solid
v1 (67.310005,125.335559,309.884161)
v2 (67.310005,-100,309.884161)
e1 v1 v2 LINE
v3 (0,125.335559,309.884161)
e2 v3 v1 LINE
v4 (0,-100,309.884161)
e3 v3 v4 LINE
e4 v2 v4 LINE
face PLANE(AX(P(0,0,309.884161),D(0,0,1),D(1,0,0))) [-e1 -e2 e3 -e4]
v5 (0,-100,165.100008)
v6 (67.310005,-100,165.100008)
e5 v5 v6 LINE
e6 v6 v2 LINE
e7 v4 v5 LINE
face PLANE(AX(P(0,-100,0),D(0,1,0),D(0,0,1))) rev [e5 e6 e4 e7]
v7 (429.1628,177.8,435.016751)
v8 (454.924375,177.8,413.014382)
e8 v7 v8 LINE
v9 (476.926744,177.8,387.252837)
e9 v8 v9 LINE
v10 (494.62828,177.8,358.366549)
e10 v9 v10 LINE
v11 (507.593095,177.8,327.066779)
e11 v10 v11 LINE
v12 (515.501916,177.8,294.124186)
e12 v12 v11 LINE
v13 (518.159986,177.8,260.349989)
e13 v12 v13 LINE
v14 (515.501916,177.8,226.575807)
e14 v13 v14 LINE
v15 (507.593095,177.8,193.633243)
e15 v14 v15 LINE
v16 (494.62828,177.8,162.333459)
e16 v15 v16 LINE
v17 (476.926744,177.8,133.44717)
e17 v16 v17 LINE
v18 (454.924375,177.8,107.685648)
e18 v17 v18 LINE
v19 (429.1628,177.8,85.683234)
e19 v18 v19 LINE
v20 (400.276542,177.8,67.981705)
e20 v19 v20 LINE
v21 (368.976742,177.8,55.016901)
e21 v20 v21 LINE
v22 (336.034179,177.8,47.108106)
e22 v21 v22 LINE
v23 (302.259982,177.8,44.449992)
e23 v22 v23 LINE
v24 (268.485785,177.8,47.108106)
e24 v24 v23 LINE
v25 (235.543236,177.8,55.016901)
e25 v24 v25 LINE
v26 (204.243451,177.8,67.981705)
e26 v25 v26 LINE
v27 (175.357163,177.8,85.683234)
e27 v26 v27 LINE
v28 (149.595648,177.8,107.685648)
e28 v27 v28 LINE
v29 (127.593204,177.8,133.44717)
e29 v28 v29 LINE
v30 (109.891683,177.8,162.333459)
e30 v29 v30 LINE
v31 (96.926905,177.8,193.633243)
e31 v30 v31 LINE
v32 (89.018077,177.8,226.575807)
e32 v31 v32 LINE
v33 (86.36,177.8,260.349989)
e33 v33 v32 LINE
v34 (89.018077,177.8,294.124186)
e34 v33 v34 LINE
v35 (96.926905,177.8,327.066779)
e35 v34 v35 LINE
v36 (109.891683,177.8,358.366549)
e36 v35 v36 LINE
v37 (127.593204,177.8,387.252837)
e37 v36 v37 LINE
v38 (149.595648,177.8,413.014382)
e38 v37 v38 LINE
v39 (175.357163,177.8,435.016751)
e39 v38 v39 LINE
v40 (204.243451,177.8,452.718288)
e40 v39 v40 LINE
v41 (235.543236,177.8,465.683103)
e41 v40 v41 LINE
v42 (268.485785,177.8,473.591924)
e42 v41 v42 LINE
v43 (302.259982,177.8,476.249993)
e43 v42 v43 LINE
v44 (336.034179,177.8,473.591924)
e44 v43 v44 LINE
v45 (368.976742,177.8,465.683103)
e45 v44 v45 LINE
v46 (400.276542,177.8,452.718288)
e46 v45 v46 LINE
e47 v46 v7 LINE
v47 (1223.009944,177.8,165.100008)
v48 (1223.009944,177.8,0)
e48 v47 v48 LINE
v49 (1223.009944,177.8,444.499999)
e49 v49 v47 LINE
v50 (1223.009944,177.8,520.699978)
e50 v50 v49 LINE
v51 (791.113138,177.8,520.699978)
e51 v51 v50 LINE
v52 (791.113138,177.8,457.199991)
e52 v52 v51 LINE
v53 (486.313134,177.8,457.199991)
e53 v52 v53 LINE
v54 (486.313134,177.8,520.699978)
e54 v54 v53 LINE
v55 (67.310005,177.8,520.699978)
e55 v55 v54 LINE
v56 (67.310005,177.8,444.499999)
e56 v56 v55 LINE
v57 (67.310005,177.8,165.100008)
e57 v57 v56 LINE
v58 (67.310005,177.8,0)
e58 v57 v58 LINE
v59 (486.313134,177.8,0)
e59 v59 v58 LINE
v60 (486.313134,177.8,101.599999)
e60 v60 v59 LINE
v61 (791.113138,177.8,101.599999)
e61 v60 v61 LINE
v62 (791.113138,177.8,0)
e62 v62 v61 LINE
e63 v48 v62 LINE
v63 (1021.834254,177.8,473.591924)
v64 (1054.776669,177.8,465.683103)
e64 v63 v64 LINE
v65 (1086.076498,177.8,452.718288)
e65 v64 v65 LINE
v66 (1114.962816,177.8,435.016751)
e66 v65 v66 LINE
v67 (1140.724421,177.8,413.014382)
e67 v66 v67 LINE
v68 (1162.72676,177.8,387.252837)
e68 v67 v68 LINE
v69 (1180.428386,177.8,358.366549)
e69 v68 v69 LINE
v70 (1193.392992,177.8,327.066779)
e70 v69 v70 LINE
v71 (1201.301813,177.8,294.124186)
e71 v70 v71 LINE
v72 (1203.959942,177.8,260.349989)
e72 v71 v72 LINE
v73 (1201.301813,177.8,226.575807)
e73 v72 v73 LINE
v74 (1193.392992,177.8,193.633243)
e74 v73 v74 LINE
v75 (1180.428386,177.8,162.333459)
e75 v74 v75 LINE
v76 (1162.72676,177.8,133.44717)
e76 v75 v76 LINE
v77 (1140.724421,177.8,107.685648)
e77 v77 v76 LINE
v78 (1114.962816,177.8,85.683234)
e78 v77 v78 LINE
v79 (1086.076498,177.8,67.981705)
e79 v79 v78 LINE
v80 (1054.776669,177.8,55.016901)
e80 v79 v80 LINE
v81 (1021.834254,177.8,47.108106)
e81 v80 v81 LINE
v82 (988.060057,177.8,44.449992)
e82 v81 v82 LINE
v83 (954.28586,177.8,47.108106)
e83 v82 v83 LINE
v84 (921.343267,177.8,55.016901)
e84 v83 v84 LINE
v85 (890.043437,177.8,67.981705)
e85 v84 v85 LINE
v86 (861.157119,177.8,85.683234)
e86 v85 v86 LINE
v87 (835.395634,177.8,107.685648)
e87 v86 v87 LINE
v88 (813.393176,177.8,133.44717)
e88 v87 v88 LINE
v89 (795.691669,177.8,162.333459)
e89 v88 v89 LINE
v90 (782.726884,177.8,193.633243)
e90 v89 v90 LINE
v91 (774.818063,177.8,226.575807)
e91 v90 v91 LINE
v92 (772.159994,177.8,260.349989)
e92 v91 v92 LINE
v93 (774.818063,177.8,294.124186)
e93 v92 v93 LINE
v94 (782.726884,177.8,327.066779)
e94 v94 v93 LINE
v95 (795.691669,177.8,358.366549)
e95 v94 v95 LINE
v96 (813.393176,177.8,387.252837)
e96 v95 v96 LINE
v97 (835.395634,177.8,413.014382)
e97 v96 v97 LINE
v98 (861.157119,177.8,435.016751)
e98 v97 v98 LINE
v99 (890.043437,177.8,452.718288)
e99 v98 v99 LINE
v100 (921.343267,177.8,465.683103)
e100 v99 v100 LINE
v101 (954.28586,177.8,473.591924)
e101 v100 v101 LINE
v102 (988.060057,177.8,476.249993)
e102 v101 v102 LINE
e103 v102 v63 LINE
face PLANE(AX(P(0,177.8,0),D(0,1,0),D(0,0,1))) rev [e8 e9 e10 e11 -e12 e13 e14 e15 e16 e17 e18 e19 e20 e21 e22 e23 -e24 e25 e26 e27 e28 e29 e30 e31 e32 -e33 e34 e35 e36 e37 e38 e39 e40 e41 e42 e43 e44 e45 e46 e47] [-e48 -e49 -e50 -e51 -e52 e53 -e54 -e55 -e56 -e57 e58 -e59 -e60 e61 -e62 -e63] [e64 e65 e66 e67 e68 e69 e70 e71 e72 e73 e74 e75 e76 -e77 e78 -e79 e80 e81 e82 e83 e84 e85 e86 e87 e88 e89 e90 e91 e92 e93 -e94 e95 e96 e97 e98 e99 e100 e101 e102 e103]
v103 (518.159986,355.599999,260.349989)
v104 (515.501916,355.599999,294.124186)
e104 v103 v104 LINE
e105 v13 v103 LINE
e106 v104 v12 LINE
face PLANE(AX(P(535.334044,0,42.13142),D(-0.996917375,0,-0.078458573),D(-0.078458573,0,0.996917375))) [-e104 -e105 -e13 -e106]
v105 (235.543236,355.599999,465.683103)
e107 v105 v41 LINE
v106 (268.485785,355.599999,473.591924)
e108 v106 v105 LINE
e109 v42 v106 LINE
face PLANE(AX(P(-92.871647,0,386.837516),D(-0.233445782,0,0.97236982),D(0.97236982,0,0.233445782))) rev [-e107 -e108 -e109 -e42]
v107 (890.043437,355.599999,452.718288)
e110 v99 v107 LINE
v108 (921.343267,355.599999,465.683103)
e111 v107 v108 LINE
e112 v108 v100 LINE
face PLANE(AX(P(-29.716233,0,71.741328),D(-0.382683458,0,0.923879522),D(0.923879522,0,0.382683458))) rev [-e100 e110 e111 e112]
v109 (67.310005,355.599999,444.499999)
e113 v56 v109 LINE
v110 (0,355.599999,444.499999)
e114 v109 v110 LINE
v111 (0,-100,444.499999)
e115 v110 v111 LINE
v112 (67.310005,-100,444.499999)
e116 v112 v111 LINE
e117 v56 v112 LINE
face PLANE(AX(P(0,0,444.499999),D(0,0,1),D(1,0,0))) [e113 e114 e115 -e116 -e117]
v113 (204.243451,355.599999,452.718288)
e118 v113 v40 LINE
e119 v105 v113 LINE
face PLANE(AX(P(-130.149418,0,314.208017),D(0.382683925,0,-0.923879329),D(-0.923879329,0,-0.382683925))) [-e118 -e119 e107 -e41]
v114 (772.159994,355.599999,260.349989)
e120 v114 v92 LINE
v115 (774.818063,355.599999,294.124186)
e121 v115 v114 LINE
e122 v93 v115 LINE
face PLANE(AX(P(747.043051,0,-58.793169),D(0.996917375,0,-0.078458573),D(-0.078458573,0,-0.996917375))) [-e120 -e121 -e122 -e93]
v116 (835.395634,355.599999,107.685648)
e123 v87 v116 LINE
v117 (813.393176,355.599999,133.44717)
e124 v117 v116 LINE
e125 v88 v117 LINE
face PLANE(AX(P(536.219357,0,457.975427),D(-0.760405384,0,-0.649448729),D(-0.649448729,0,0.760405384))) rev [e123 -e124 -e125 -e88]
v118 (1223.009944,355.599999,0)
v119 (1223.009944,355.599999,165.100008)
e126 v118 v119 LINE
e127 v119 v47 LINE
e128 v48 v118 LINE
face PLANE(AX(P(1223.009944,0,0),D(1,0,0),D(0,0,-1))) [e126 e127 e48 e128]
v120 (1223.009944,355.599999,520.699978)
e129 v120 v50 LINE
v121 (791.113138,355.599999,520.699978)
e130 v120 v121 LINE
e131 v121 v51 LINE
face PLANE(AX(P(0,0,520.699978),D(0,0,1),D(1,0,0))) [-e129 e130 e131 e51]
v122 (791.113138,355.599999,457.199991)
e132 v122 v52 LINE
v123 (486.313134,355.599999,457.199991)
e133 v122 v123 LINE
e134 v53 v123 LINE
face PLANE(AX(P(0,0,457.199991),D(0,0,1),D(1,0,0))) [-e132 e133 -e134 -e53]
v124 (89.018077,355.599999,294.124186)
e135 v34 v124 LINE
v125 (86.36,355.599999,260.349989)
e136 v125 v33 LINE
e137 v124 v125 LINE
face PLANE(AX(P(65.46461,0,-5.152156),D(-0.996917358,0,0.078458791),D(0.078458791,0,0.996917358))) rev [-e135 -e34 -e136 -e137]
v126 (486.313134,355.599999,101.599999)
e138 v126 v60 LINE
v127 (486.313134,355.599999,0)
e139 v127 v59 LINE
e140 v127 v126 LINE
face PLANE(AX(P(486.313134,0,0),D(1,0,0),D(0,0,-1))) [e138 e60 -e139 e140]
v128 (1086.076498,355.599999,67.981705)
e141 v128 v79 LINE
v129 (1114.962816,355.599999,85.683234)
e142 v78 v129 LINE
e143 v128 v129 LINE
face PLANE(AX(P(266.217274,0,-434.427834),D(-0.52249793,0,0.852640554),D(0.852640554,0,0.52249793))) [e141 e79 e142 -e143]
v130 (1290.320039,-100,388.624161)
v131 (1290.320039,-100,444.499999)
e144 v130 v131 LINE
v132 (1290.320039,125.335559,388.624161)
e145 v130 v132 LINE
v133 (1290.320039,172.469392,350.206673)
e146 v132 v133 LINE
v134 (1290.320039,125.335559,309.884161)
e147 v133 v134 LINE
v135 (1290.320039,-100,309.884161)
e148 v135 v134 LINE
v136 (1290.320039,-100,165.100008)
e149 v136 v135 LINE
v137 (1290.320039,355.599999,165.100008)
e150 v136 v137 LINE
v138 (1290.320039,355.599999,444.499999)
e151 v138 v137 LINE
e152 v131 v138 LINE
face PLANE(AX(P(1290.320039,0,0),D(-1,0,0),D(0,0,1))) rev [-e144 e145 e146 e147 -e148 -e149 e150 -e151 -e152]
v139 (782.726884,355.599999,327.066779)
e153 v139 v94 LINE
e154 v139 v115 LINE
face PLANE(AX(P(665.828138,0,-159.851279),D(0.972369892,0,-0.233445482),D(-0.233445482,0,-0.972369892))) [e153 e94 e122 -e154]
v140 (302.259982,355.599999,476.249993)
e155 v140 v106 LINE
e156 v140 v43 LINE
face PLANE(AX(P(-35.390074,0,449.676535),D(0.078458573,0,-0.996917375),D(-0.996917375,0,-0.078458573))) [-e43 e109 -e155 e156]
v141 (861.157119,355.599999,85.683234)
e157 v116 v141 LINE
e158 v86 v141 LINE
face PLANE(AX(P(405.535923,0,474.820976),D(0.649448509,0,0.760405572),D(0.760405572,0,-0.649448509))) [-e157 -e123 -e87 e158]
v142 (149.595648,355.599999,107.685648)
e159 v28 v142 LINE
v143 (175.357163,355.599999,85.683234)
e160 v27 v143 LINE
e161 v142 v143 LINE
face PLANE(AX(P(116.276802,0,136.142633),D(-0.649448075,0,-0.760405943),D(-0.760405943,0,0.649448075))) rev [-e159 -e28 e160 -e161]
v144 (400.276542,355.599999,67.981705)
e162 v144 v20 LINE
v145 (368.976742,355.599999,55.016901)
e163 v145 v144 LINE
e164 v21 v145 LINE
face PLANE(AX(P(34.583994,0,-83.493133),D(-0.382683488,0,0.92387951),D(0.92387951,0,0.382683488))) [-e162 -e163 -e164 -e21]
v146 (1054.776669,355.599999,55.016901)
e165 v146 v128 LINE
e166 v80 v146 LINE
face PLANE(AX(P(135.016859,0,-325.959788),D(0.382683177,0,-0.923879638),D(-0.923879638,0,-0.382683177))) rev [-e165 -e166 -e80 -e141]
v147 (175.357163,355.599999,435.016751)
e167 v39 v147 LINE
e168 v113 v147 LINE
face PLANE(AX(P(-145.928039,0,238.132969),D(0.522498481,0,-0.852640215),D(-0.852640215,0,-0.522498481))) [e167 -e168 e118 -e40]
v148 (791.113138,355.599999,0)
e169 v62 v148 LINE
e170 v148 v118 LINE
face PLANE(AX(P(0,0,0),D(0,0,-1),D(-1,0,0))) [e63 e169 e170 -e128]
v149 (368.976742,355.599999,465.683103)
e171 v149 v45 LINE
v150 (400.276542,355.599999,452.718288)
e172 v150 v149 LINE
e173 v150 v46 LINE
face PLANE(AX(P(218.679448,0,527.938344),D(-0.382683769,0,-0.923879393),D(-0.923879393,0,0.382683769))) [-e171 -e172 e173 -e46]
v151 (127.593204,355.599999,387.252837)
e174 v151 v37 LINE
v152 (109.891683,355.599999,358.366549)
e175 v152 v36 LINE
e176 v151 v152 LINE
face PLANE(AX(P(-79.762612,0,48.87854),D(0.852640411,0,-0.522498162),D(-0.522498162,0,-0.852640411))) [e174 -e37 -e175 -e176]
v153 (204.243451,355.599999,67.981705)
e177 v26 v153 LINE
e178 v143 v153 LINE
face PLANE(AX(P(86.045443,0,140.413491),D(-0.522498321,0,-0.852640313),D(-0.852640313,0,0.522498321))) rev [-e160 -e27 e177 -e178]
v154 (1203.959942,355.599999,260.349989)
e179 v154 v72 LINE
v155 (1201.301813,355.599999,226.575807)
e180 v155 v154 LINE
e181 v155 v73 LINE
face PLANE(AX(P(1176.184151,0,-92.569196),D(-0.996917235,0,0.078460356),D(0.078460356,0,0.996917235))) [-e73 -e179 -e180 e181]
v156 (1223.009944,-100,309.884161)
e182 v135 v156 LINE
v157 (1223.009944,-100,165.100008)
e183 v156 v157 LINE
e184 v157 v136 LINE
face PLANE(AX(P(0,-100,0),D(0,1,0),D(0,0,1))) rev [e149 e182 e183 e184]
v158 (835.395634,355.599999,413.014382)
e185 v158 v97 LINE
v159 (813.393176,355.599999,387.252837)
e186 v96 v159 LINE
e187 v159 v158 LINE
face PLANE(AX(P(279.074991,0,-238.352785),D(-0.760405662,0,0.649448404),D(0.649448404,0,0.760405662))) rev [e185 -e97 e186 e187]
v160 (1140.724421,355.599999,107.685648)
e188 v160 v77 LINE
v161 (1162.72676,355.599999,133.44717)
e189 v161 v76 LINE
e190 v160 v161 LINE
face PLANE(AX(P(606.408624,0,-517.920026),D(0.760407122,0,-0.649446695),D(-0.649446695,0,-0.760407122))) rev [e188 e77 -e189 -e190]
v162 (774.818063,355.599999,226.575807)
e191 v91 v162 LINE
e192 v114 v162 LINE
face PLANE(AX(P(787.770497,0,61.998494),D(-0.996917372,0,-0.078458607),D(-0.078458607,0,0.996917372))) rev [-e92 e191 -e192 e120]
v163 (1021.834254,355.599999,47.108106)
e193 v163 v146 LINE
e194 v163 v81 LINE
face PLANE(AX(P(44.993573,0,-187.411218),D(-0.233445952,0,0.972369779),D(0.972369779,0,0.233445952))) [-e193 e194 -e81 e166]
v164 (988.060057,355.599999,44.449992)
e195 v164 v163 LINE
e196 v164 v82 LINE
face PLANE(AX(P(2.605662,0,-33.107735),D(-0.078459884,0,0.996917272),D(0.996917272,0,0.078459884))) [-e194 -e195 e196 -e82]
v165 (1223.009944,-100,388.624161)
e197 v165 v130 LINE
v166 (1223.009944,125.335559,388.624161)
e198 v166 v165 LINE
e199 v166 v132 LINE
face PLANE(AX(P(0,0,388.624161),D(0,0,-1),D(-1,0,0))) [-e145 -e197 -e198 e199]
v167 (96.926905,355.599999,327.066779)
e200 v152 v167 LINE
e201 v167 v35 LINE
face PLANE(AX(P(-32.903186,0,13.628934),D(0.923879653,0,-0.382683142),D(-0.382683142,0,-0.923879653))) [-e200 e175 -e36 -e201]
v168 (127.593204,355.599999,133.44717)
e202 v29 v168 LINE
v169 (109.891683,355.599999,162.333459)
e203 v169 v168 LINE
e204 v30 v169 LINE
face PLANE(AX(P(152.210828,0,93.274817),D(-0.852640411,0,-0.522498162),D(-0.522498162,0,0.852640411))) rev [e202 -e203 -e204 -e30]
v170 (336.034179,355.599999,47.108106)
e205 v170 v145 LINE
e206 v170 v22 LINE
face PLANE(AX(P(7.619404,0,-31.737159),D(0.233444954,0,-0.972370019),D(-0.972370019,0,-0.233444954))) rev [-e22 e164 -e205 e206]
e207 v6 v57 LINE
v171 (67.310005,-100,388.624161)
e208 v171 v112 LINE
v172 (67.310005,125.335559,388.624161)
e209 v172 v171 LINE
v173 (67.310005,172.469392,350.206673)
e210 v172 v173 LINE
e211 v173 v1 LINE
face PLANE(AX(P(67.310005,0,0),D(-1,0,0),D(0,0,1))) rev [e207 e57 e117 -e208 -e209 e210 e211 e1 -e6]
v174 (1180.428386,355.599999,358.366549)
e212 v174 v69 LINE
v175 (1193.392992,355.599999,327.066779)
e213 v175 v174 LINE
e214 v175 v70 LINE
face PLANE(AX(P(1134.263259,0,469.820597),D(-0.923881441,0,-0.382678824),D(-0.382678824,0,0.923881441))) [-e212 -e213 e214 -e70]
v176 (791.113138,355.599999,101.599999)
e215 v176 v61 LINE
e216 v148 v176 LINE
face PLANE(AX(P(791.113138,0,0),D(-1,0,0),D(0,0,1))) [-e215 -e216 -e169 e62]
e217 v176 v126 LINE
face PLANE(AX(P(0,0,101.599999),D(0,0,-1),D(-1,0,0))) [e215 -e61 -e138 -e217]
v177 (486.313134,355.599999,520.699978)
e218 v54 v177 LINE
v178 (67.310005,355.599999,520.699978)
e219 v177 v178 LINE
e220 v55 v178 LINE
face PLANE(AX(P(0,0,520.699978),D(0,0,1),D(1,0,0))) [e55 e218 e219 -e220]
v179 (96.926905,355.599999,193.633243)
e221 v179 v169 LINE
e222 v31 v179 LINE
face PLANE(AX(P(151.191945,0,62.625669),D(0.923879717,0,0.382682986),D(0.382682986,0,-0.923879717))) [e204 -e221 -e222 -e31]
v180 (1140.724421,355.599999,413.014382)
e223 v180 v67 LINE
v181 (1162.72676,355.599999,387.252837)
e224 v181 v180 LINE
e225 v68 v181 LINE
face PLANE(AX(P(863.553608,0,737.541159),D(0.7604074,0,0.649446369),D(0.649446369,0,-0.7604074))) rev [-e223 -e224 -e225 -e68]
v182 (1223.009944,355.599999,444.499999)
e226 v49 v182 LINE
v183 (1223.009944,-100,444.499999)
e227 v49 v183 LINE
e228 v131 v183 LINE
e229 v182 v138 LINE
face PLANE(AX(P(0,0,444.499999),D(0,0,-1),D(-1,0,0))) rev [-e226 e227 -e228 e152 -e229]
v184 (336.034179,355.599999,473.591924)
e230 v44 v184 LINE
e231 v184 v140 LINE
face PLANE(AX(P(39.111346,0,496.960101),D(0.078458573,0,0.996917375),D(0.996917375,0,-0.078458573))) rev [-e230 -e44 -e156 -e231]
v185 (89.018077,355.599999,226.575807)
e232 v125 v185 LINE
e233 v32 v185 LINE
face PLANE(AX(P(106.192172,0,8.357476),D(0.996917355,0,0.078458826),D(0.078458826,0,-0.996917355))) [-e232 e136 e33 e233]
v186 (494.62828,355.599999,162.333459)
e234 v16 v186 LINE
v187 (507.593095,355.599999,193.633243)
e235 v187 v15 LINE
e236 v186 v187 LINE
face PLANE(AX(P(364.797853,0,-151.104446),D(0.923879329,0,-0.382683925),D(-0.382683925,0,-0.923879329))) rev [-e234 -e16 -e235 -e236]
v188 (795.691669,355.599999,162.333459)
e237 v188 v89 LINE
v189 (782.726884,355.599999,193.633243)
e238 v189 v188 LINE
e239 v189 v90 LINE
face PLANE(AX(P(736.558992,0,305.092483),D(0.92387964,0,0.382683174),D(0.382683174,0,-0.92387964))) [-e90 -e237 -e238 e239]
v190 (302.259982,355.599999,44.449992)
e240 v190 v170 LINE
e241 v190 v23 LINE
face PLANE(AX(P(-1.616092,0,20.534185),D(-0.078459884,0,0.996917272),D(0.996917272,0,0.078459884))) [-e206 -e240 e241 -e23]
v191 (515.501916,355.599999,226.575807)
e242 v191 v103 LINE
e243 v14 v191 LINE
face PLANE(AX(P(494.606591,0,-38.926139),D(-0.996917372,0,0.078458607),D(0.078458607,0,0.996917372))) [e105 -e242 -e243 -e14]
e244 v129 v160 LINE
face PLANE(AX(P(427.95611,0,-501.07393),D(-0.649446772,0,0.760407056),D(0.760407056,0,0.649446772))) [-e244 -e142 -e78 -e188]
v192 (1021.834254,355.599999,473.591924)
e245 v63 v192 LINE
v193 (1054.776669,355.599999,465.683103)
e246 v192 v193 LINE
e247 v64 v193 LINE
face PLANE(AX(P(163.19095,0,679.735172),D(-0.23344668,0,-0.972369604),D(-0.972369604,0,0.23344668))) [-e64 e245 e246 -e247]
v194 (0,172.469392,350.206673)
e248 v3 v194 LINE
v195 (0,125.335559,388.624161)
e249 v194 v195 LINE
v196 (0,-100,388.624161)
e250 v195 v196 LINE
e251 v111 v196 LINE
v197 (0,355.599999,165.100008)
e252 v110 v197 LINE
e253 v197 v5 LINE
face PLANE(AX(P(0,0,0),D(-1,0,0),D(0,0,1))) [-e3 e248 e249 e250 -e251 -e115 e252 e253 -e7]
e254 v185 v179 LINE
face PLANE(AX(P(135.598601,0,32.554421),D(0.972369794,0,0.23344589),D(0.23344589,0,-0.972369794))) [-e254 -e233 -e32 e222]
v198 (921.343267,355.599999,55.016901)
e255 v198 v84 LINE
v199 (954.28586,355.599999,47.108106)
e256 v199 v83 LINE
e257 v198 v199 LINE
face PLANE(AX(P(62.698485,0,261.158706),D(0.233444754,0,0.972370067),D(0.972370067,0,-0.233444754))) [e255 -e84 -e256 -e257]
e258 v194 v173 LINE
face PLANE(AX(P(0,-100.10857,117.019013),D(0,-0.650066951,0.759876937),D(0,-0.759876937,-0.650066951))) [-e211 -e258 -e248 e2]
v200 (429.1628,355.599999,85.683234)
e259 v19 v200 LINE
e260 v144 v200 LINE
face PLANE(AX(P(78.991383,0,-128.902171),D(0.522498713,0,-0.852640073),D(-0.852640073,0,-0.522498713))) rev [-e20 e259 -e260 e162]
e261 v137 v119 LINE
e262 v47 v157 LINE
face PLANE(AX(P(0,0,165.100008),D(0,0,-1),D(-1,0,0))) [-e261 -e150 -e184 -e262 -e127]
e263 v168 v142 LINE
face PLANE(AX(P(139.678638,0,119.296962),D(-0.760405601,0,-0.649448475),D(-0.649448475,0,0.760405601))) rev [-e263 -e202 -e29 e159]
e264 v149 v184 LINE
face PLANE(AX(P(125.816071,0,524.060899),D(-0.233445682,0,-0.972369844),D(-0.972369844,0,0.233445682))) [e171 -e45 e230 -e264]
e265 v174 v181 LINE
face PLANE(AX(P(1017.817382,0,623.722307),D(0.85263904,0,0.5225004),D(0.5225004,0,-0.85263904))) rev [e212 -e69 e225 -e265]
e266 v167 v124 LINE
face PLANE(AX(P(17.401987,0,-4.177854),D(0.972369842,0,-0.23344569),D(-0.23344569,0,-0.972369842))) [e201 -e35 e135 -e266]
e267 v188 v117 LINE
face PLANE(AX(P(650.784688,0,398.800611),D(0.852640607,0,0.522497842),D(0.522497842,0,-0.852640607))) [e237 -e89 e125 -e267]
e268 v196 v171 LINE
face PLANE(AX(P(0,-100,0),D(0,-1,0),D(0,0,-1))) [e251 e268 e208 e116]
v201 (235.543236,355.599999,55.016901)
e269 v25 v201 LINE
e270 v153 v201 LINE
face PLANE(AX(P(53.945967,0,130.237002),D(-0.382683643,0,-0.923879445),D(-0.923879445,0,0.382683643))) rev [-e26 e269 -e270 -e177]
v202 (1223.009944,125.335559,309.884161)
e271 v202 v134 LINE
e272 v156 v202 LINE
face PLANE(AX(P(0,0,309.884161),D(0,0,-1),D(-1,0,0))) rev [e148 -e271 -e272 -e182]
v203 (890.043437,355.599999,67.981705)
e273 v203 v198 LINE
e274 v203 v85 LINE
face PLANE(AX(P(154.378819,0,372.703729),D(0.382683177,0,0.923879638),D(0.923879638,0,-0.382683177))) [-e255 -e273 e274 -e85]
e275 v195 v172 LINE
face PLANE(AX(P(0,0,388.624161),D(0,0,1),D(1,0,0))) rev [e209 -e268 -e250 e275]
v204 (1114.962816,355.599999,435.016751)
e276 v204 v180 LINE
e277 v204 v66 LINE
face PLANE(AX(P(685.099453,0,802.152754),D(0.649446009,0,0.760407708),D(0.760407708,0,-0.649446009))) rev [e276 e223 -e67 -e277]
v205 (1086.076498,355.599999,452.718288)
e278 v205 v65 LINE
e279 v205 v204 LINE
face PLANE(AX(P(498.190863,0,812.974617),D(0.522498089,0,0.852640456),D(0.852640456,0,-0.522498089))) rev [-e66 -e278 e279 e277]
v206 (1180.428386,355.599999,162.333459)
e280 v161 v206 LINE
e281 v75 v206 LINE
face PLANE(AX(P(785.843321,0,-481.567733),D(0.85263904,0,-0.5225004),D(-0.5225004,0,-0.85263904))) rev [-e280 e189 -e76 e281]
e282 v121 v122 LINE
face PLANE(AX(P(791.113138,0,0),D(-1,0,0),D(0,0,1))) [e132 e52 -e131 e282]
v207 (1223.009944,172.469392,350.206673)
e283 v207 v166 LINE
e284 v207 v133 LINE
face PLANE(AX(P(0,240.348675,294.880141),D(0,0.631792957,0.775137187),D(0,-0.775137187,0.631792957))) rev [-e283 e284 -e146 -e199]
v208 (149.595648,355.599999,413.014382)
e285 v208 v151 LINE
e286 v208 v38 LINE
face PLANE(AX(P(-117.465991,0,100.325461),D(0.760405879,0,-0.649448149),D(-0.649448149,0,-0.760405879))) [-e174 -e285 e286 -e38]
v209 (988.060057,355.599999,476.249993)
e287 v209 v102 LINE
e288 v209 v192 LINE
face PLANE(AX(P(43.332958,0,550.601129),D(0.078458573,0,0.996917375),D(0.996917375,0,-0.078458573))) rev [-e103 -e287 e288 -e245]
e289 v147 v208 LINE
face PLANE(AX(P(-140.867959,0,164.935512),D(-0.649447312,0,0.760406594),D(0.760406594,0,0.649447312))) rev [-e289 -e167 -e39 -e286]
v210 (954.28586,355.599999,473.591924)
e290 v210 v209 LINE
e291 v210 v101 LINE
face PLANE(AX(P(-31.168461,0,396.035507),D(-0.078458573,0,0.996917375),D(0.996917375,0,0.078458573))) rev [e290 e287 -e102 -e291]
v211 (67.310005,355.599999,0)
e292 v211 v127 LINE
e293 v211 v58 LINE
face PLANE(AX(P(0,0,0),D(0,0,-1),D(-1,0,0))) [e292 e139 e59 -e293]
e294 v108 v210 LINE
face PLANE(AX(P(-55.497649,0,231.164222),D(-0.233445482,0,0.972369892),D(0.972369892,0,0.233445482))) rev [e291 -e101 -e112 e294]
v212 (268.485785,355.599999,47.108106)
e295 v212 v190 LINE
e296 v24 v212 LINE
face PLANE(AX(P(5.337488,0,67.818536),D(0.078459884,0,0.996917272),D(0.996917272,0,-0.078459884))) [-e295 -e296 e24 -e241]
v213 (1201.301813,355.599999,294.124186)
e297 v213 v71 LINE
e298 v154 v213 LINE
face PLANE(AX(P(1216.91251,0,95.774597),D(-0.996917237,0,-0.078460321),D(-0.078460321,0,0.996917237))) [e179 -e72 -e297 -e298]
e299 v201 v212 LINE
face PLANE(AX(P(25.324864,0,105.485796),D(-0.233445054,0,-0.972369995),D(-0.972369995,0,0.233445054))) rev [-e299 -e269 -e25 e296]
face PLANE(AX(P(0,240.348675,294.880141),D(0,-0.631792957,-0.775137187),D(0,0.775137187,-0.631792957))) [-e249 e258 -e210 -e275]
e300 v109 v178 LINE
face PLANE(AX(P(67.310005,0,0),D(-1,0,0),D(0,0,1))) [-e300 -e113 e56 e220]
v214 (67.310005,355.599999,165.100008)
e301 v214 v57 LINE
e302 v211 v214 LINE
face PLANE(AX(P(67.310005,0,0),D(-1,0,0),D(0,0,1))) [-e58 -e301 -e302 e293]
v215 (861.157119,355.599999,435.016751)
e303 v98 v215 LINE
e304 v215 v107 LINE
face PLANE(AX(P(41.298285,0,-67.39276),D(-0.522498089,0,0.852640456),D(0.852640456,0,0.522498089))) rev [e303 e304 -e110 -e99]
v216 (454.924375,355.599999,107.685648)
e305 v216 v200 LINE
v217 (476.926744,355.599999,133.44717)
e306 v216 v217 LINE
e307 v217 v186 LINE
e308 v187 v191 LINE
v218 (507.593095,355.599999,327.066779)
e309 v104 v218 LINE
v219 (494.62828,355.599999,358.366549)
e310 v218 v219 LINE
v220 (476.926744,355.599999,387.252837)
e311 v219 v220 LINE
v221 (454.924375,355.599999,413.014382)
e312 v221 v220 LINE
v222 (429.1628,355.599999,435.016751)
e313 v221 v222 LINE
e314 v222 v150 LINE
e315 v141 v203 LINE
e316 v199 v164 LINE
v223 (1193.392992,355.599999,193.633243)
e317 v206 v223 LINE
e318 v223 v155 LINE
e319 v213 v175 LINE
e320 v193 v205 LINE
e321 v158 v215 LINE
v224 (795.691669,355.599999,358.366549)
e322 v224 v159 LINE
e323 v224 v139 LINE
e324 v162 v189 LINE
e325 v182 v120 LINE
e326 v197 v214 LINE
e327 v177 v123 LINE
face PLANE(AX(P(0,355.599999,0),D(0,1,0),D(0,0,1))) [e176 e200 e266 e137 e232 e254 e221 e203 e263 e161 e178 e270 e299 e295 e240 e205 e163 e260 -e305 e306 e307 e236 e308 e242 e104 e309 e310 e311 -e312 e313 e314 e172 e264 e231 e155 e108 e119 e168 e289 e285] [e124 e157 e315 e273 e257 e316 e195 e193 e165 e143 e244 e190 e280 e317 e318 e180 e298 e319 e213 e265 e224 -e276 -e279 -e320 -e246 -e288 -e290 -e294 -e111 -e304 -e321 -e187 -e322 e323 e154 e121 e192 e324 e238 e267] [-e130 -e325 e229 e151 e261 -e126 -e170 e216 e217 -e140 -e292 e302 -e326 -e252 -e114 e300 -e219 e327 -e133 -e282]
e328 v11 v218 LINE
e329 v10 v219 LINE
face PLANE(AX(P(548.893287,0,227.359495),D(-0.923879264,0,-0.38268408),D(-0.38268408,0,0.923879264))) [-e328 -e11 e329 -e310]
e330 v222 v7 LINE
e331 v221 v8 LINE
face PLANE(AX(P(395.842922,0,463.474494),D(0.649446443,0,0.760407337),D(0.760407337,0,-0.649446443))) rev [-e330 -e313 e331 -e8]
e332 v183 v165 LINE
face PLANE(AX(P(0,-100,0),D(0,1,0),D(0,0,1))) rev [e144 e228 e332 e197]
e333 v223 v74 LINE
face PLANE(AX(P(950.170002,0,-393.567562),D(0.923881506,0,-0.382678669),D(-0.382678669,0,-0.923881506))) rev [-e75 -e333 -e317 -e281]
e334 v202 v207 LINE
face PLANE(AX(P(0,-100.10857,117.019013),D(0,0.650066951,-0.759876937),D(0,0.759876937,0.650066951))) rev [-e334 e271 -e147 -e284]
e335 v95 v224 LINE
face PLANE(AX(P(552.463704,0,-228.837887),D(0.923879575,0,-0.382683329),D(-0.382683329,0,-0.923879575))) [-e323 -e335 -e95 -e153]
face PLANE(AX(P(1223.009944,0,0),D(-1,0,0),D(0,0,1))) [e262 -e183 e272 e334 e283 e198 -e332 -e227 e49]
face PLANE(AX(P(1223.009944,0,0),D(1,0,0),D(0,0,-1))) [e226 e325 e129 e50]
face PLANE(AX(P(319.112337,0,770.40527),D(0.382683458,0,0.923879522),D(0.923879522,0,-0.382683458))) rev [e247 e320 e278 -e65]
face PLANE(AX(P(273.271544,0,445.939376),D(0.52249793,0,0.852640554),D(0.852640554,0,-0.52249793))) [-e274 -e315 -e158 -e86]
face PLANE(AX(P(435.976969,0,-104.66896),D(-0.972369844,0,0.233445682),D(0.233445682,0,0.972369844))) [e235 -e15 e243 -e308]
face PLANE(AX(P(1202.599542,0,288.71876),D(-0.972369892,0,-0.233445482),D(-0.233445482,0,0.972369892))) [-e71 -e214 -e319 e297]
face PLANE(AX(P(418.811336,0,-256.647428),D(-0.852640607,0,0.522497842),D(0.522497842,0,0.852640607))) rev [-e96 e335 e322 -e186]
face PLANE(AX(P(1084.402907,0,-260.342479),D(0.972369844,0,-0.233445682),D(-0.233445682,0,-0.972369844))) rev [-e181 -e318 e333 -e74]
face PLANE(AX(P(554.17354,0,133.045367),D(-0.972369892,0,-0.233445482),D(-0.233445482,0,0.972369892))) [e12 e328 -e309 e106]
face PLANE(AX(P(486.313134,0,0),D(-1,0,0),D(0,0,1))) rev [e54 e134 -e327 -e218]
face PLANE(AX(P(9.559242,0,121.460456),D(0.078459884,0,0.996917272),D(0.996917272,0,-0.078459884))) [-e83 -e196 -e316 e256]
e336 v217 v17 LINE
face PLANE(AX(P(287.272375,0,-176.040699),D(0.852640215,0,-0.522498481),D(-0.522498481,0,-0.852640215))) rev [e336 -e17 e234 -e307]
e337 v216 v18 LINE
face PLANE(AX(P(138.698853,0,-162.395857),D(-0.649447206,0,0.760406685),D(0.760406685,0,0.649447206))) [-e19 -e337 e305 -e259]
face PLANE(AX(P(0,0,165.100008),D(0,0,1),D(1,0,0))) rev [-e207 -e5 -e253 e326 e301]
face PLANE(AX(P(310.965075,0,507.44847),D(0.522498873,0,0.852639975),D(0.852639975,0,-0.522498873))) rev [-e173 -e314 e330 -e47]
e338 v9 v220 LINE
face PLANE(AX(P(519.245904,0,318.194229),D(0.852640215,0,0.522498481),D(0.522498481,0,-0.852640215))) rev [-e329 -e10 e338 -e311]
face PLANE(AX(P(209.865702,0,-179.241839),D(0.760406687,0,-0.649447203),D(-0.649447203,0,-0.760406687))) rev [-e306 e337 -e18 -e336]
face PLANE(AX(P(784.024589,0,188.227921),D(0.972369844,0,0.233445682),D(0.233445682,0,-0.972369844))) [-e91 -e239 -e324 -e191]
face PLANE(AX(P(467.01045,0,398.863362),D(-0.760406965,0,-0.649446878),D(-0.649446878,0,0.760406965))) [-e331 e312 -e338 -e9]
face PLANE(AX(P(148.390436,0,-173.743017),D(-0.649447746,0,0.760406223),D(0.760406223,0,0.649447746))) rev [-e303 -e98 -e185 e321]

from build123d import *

# Parameters (mm, degrees)
CONVERTED1_START         = 177.799999714
CONVERTED1_DEPTH         = 177.799999714
CONVERTED1_2_OUTLINE_W   = 67.310094833
CONVERTED1_2_OUTLINE_H   = 144.784152508
CONVERTED1_2_OUTLINE_H_2 = 55.875837803
CONVERTED1_2_OUTLINE_W_2 = 67.310005426
CONVERTED1_2_DEPTH       = 177.799999714
CONVERTED1_START_2       = 125.335559249
CONVERTED1_3_OUTLINE_W   = 67.310094833
CONVERTED1_3_OUTLINE_H   = 78.740000725
CONVERTED1_3_OUTLINE_W_2 = 67.310005426
CONVERTED1_3_DEPTH       = 52.464440465
CONVERTED1_START_3       = -1
CONVERTED1_4_DEPTH       = 1292
SKETCH1_W                = 67.310005426
SKETCH1_H                = 144.784152508
SKETCH1_H_2              = 55.875837803
SKETCH1_W_2              = 67.310094833
BOSS_EXTRUDE1_DEPTH      = 100


with BuildPart() as part:
    # Converted1: read off the stored shape, not the designer's step
    # Converted1 outline → Converted1 (new body)
    with BuildSketch(Plane(origin=(0, 0, 0), x_dir=(1, 0, 0), z_dir=(0, 1, 0)).offset(CONVERTED1_START)):
        Polygon((1223.009943962, -165.100008249), (1223.009943962, 0), (791.113138199, 0), (791.113138199, -101.599998772), (486.313134432, -101.599998772), (486.313134432, 0), (67.310005426, 0), (67.310005426, -165.100008249), (0, -165.100008249), (0, -444.499999285), (67.310005426, -444.499999285), (67.310005426, -520.699977875), (486.313134432, -520.699977875), (486.313134432, -457.199990749), (791.113138199, -457.199990749), (791.113138199, -520.699977875), (1223.009943962, -520.699977875), (1223.009943962, -444.499999285), (1290.320038795, -444.499999285), (1290.320038795, -165.100008249), align=None)
        Polygon((515.501916409, -226.575806737), (518.159985542, -260.349988937), (515.501916409, -294.124186039), (507.593095303, -327.066779137), (494.628280401, -358.366549015), (476.926743984, -387.25283742), (454.924374819, -413.014382124), (429.162800312, -435.016751289), (400.27654171, -452.718287706), (368.976742029, -465.683102608), (336.034178734, -473.591923714), (302.259981632, -476.249992847), (268.485784531, -473.591923714), (235.543236136, -465.683102608), (204.243451357, -452.718287706), (175.357162952, -435.016751289), (149.59564805, -413.014382124), (127.593204379, -387.25283742), (109.891682863, -358.366549015), (96.926905215, -327.066779137), (89.018076658, -294.124186039), (86.360000074, -260.349988937), (89.018076658, -226.575806737), (96.926905215, -193.633243442), (109.891682863, -162.333458662), (127.593204379, -133.447170258), (149.59564805, -107.685647905), (175.357162952, -85.683234036), (204.243451357, -67.98170507), (235.543236136, -55.016901344), (268.485784531, -47.108106315), (302.259981632, -44.449992478), (336.034178734, -47.108106315), (368.976742029, -55.016901344), (400.27654171, -67.98170507), (429.162800312, -85.683234036), (454.924374819, -107.685647905), (476.926743984, -133.447170258), (494.628280401, -162.333458662), (507.593095303, -193.633243442), align=None, mode=Mode.SUBTRACT)
        Polygon((1054.776668549, -55.016901344), (1086.076498032, -67.98170507), (1114.962816238, -85.683234036), (1140.724420547, -107.685647905), (1162.726759911, -133.447170258), (1180.428385735, -162.333458662), (1193.39299202, -193.633243442), (1201.301813126, -226.575806737), (1203.959941864, -260.349988937), (1201.301813126, -294.124186039), (1193.39299202, -327.066779137), (1180.428385735, -358.366549015), (1162.726759911, -387.25283742), (1140.724420547, -413.014382124), (1114.962816238, -435.016751289), (1086.076498032, -452.718287706), (1054.776668549, -465.683102608), (1021.834254265, -473.591923714), (988.060057163, -476.249992847), (954.285860062, -473.591923714), (921.343266964, -465.683102608), (890.043437481, -452.718287706), (861.157119274, -435.016751289), (835.395634174, -413.014382124), (813.393175602, -387.25283742), (795.691668987, -358.366549015), (782.726883888, -327.066779137), (774.818062782, -294.124186039), (772.159993649, -260.349988937), (774.818062782, -226.575806737), (782.726883888, -193.633243442), (795.691668987, -162.333458662), (813.393175602, -133.447170258), (835.395634174, -107.685647905), (861.157119274, -85.683234036), (890.043437481, -67.98170507), (921.343266964, -55.016901344), (954.285860062, -47.108106315), (988.060057163, -44.449992478), (1021.834254265, -47.108106315), align=None, mode=Mode.SUBTRACT)
    extrude(amount=CONVERTED1_DEPTH)



with BuildPart() as body_2:
    # Converted1 2 outline → Converted1 2 (new body)
    with BuildSketch(Plane(origin=(0, 0, 0), x_dir=(1, 0, 0), z_dir=(0, 1, 0))):
        with Locations((1256.664991378, -237.492084503)):
            Rectangle(CONVERTED1_2_OUTLINE_W, CONVERTED1_2_OUTLINE_H)
        with Locations((1256.664991378, -416.562080384)):
            Rectangle(CONVERTED1_2_OUTLINE_W, CONVERTED1_2_OUTLINE_H_2)
        with Locations((33.655002713, -237.492084503)):
            Rectangle(CONVERTED1_2_OUTLINE_W_2, CONVERTED1_2_OUTLINE_H)
        with Locations((33.655002713, -416.562080384)):
            Rectangle(CONVERTED1_2_OUTLINE_W_2, CONVERTED1_2_OUTLINE_H_2)
    extrude(amount=CONVERTED1_2_DEPTH)


with BuildPart() as part_1:
    add(part.part)

    add(body_2.part)  # Converted1 3 merges body 2
    # Converted1 3 outline → Converted1 3 (add)
    with BuildSketch(Plane(origin=(0, 0, 0), x_dir=(1, 0, 0), z_dir=(0, 1, 0)).offset(CONVERTED1_START_2)):
        with Locations((1256.664991378, -349.25416112)):
            Rectangle(CONVERTED1_3_OUTLINE_W, CONVERTED1_3_OUTLINE_H)
        with Locations((33.655002713, -349.25416112)):
            Rectangle(CONVERTED1_3_OUTLINE_W_2, CONVERTED1_3_OUTLINE_H)
    extrude(amount=CONVERTED1_3_DEPTH)

    # Converted1 4 outline → Converted1 4 (cut)
    with BuildSketch(Plane.YZ.offset(CONVERTED1_START_3)):
        Polygon((125.335559249, 388.624161482), (125.335559249, 309.884160757), (172.469392419, 350.206673145), align=None)
    extrude(amount=CONVERTED1_4_DEPTH, mode=Mode.SUBTRACT)

    # Sketch1 → Boss-Extrude1 (add)
    with BuildSketch(Plane.XZ):
        with Locations((33.655002713, 237.492084503)):
            Rectangle(SKETCH1_W, SKETCH1_H)
        with Locations((33.655002713, 416.562080384)):
            Rectangle(SKETCH1_W, SKETCH1_H_2)
        with Locations((1256.664991378, 416.562080384)):
            Rectangle(SKETCH1_W_2, SKETCH1_H_2)
        with Locations((1256.664991378, 237.492084503)):
            Rectangle(SKETCH1_W_2, SKETCH1_H)
    extrude(amount=BOSS_EXTRUDE1_DEPTH)


solid = part_1.part
